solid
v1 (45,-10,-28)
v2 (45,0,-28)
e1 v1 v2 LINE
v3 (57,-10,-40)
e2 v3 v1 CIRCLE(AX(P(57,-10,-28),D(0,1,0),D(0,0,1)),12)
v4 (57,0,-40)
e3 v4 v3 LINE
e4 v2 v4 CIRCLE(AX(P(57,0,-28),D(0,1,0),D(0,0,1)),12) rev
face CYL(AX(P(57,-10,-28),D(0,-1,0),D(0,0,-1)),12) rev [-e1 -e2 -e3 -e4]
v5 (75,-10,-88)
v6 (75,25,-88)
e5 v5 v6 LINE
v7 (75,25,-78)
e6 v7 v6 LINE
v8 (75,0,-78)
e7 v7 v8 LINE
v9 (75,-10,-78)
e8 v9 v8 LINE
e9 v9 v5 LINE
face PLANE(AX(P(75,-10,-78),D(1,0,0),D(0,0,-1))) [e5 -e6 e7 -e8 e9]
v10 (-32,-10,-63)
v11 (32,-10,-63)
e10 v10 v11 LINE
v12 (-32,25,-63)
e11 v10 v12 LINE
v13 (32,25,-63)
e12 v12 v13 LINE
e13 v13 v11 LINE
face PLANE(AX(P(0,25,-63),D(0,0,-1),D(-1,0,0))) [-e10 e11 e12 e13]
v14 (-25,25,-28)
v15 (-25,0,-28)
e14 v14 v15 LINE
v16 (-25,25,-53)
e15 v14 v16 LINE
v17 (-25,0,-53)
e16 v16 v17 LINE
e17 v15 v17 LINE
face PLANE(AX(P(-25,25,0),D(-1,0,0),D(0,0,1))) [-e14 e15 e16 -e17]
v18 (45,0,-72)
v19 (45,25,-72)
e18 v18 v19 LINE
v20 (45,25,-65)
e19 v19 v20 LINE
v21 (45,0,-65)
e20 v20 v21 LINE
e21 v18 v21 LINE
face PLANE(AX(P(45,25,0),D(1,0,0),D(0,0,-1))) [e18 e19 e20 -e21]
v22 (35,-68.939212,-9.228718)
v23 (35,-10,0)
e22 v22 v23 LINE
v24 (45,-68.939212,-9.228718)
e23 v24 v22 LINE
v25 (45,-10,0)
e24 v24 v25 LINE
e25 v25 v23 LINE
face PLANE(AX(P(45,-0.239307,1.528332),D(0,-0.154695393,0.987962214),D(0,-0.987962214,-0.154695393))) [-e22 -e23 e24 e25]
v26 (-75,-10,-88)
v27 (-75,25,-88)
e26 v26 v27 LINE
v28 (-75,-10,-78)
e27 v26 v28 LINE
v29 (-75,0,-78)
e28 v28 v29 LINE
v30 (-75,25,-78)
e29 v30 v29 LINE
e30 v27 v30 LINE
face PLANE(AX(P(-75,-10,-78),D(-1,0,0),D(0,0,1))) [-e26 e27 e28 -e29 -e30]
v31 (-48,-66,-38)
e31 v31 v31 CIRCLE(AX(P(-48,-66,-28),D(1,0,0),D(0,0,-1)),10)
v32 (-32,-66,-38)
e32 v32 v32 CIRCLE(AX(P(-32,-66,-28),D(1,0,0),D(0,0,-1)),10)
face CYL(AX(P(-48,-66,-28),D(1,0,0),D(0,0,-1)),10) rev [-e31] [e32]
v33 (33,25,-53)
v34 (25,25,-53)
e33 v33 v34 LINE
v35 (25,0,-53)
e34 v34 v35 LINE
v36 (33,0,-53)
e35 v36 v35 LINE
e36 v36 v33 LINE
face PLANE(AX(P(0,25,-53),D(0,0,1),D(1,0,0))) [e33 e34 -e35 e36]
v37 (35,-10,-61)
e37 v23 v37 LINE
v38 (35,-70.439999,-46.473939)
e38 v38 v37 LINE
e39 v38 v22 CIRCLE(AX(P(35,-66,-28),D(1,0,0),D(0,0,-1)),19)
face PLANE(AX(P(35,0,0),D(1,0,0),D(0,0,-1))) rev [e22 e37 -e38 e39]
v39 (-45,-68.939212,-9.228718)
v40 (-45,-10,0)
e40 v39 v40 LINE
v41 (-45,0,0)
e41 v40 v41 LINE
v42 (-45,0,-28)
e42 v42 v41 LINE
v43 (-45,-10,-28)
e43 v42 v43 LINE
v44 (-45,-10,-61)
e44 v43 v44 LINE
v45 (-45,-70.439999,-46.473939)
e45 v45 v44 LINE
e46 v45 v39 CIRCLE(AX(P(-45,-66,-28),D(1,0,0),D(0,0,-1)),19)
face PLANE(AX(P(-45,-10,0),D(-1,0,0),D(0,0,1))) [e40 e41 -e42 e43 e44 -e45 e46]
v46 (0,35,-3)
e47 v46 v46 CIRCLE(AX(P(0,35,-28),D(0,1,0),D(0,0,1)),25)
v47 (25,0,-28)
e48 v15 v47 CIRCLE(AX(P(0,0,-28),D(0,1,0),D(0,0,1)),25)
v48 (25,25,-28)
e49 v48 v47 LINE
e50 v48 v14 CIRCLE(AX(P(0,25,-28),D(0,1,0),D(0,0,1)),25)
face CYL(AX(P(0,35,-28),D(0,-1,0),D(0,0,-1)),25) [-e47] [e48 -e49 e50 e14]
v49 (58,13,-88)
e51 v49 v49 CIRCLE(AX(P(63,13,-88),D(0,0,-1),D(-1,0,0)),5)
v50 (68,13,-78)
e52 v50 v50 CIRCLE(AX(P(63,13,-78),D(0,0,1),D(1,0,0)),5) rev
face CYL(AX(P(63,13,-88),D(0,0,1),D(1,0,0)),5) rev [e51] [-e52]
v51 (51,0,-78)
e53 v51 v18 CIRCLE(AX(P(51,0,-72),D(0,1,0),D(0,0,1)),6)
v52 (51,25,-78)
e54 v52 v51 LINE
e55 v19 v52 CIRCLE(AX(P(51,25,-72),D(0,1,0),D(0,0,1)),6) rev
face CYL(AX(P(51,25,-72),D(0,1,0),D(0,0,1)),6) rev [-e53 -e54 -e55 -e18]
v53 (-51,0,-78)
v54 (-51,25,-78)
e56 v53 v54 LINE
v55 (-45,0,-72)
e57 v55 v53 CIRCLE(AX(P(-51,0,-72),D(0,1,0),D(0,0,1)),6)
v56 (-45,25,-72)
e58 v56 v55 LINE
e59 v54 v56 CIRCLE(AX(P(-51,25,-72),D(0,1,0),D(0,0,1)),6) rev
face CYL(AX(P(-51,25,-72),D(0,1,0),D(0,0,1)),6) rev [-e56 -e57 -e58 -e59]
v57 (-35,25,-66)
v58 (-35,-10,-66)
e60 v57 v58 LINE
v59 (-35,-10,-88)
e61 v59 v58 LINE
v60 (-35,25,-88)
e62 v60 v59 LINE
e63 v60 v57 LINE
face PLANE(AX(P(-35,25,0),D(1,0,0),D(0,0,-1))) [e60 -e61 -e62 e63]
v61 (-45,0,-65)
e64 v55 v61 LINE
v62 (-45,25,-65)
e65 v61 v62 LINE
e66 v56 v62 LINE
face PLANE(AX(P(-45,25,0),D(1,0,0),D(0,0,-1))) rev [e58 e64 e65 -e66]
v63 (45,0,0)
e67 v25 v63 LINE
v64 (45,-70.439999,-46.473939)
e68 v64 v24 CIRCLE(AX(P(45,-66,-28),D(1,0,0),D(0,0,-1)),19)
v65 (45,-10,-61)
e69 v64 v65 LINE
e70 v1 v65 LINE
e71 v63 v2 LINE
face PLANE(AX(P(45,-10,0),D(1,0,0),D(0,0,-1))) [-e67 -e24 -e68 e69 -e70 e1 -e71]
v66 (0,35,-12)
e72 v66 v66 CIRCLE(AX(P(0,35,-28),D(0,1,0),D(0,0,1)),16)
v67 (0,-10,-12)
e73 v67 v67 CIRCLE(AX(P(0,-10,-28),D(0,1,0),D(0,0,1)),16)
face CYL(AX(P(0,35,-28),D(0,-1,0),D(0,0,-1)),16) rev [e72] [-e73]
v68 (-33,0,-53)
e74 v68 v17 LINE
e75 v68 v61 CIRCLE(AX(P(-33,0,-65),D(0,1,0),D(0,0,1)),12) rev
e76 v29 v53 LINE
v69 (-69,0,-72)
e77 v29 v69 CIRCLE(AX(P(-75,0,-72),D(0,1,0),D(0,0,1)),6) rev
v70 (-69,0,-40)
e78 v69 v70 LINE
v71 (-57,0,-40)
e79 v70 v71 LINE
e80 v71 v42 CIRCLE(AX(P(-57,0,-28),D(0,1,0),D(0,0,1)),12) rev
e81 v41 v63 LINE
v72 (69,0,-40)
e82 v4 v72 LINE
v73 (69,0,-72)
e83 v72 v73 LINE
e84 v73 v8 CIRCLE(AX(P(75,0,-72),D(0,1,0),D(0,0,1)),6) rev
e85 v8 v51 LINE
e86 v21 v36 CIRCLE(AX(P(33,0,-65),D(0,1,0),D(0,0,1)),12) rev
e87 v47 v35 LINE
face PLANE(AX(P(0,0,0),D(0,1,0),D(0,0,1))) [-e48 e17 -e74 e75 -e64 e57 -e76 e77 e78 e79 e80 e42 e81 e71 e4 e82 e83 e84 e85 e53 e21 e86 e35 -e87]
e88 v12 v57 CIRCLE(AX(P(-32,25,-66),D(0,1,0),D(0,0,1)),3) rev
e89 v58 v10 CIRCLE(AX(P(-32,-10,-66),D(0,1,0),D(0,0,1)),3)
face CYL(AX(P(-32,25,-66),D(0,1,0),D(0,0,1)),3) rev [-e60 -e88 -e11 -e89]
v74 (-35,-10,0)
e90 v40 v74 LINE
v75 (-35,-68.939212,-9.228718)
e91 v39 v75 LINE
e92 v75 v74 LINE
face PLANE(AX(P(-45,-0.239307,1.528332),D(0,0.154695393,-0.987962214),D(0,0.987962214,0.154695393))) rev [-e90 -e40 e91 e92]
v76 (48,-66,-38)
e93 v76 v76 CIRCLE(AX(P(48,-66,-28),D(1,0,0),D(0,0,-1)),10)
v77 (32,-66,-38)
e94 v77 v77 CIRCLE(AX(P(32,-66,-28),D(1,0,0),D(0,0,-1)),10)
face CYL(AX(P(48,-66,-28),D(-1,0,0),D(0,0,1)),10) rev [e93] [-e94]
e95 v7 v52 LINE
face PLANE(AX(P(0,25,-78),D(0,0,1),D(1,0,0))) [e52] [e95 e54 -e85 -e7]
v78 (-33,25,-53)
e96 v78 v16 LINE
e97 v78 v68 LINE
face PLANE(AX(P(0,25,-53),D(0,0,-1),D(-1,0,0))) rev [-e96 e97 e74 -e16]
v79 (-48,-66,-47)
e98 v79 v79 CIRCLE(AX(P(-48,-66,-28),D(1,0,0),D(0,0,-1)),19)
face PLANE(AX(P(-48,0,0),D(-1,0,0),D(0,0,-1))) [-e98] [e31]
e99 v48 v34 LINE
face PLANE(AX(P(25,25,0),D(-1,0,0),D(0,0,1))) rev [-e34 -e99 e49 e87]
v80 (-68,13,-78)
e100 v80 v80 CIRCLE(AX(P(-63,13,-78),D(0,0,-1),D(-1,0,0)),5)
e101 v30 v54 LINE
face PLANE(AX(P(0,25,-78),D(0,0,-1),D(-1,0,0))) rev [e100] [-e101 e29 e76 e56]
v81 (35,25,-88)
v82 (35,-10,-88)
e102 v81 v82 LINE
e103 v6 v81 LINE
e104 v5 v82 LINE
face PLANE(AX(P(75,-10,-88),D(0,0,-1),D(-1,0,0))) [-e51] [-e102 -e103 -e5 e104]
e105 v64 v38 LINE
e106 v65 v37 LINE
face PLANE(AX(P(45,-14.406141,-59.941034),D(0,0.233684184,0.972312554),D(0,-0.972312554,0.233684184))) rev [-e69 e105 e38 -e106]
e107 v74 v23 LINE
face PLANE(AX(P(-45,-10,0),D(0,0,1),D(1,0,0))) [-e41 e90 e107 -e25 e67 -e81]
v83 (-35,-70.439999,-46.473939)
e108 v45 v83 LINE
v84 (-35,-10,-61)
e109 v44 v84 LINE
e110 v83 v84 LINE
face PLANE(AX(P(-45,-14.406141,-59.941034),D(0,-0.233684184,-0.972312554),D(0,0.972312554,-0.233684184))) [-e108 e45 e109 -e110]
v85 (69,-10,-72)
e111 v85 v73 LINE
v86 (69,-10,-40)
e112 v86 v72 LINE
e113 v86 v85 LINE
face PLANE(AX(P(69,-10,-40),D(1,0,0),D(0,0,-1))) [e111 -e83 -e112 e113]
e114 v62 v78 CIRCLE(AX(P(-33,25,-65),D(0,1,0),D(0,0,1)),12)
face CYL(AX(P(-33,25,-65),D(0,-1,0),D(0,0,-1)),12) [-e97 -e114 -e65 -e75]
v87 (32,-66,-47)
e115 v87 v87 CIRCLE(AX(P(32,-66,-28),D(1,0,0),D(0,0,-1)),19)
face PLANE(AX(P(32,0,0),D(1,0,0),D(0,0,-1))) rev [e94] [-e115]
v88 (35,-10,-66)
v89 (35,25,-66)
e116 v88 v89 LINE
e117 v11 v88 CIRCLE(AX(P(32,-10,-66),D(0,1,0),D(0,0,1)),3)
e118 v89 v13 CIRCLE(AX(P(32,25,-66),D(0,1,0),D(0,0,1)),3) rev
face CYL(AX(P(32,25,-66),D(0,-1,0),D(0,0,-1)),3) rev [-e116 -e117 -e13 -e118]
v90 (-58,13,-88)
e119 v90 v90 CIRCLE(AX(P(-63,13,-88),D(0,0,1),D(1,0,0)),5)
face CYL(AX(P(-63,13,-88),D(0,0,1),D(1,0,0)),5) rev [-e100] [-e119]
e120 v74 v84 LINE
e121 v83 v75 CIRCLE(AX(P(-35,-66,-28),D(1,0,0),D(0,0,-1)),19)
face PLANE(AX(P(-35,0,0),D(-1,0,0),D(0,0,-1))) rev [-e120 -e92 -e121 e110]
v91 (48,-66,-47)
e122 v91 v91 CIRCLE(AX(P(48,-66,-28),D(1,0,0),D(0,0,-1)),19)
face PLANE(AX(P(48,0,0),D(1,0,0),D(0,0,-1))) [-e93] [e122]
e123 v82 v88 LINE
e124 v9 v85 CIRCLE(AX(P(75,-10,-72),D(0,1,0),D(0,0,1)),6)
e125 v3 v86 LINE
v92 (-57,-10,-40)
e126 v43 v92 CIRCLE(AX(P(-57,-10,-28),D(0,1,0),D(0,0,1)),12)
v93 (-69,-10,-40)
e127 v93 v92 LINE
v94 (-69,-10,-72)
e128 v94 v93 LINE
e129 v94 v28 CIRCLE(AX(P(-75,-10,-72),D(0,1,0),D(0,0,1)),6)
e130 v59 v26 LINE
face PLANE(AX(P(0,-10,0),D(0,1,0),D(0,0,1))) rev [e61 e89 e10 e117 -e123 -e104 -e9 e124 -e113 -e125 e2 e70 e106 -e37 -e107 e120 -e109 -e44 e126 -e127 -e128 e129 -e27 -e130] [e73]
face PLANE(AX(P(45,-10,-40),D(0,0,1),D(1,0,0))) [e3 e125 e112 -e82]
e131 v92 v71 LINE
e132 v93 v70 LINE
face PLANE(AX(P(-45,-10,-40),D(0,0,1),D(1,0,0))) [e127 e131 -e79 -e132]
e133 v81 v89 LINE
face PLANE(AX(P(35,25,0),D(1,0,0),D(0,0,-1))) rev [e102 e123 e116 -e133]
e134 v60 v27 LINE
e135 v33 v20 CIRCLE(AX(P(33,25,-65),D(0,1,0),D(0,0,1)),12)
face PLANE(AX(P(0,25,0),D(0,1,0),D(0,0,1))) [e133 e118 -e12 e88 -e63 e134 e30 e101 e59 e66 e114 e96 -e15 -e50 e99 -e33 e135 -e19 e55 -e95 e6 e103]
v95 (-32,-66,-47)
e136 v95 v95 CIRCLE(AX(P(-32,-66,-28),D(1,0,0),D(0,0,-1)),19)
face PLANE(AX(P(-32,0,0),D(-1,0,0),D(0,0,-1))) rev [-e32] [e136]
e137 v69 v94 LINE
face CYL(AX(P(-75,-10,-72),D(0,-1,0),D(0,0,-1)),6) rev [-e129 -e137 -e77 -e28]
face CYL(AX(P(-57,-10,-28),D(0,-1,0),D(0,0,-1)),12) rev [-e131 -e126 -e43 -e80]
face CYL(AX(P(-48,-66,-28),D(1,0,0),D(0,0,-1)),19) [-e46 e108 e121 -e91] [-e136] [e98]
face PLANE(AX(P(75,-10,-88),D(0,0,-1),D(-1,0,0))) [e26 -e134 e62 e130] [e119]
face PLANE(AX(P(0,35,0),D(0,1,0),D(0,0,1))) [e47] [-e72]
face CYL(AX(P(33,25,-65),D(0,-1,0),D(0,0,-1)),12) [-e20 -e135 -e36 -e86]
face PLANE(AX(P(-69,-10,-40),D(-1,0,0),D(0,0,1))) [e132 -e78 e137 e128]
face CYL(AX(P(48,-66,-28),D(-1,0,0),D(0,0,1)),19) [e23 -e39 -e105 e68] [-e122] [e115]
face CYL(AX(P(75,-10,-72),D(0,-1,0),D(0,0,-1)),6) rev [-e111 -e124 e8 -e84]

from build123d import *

# Parameters (mm, degrees)
EXTRUDE_1_DEPTH     = 10
FILLET_1_R          = 12
FILLET_2_R          = 6
EXTRUDE_2_DEPTH     = 25
EXTRUDE_3_DEPTH     = 35
SKETCH_2_4_W        = 70
SKETCH_2_4_H        = 25
CUT_EXTRUDE_1_DEPTH = 35
FILLET_3_R          = 6
FILLET_4_R          = 12
FILLET_5_R          = 3
CUT_EXTRUDE_START   = -35
CUT_EXTRUDE_2_DEPTH = 35
EXTRUDE_START       = 35
EXTRUDE_4_DEPTH     = 10
EXTRUDE_START_2     = 32
SKETCH_6_4_R        = 19
SKETCH_6_4_R_2      = 10
EXTRUDE_5_DEPTH     = 16
SKETCH_7_R          = 5
CUT_EXTRUDE_3_DEPTH = 144.506097431


with BuildPart() as part:
    # 草图1 → 凸台-拉伸1 (new body)
    with BuildSketch(Plane(origin=(0, 0, 0), x_dir=(1, 0, 0), z_dir=(0, 1, 0))):
        Polygon((45, 0), (45, 40), (69, 40), (69, 78), (75, 78), (75, 88), (-75, 88), (-75, 78), (-69, 78), (-69, 40), (-45, 40), (-45, 0), align=None)
    extrude(amount=-EXTRUDE_1_DEPTH)

    # 圆角1
    fillet_1_edges = [part.edges().sort_by_distance(p)[0] for p in [
        (-45, -5, -40),
        (45, -5, -40),
    ]]
    fillet(fillet_1_edges, radius=FILLET_1_R)

    # 圆角2
    fillet_2_edges = [part.edges().sort_by_distance(p)[0] for p in [
        (69, -5, -78),
        (-69, -5, -78),
    ]]
    fillet(fillet_2_edges, radius=FILLET_2_R - 0.0001)  # a hair under: the kernel refuses the full size

    # 草图2 → 凸台-拉伸2 (add)
    with BuildSketch(Plane(origin=(0, 0, 0), x_dir=(1, 0, 0), z_dir=(0, 1, 0))):
        with BuildLine():
            Line((-25, 53), (-25, 28))
            ThreePointArc((-25, 28), (-17.67766953, 45.67766953), (0, 53))
            Line((0, 53), (0, 63))
            Line((0, 63), (-35, 63))
            Line((-35, 63), (-35, 88))
            Line((-35, 88), (-75, 88))
            Line((-75, 88), (-75, 78))
            Line((-75, 78), (-45, 78))
            Line((-45, 78), (-45, 53))
            Line((-45, 53), (-25, 53))
        make_face()
        with BuildLine():
            ThreePointArc((0, 53), (17.67766953, 45.67766953), (25, 28))
            Line((25, 28), (25, 53))
            Line((25, 53), (45, 53))
            Line((45, 53), (45, 78))
            Line((45, 78), (75, 78))
            Line((75, 78), (75, 88))
            Line((75, 88), (35, 88))
            Line((35, 88), (35, 63))
            Line((35, 63), (0, 63))
            Line((0, 63), (0, 53))
        make_face()
    extrude(amount=EXTRUDE_2_DEPTH)

    # 草图2<3> → 凸台-拉伸3 (add)
    with BuildSketch(Plane(origin=(0, 0, 0), x_dir=(1, 0, 0), z_dir=(0, 1, 0))):
        with BuildLine():
            ThreePointArc((-25, 28), (-17.67766953, 10.32233047), (0, 3))
            Line((0, 3), (0, 12))
            ThreePointArc((0, 12), (-16, 28), (0, 44))
            Line((0, 44), (0, 53))
            ThreePointArc((0, 53), (-17.67766953, 45.67766953), (-25, 28))
        make_face()
        with BuildLine():
            Line((0, 12), (0, 3))
            ThreePointArc((0, 3), (17.67766953, 10.32233047), (25, 28))
            ThreePointArc((25, 28), (17.67766953, 45.67766953), (0, 53))
            Line((0, 53), (0, 44))
            ThreePointArc((0, 44), (11.313708499, 39.313708499), (16, 28))
            ThreePointArc((16, 28), (11.313708499, 16.686291501), (0, 12))
        make_face()
    extrude(amount=EXTRUDE_3_DEPTH)

    # 草图2<4> → 切除-拉伸1 (cut)
    with BuildSketch(Plane(origin=(0, 0, 0), x_dir=(1, 0, 0), z_dir=(0, 1, 0))):
        with Locations((0, 75.5)):
            Rectangle(SKETCH_2_4_W, SKETCH_2_4_H)
    extrude(amount=-CUT_EXTRUDE_1_DEPTH, mode=Mode.SUBTRACT)

    # 圆角3
    fillet_3_edges = [part.edges().sort_by_distance(p)[0] for p in [
        (45, 12.5, -78),
        (-45, 12.5, -78),
    ]]
    fillet(fillet_3_edges, radius=FILLET_3_R)

    # 圆角4
    fillet_4_edges = [part.edges().sort_by_distance(p)[0] for p in [
        (45, 12.5, -53),
        (-45, 12.5, -53),
    ]]
    fillet(fillet_4_edges, radius=FILLET_4_R)

    # 圆角5
    fillet_5_edges = [part.edges().sort_by_distance(p)[0] for p in [
        (35, 7.5, -63),
        (-35, 7.5, -63),
    ]]
    fillet(fillet_5_edges, radius=FILLET_5_R)

    # 草图2<5> → 切除-拉伸2 (cut)
    with BuildSketch(Plane(origin=(0, 0, 0), x_dir=(1, 0, 0), z_dir=(0, 1, 0)).offset(CUT_EXTRUDE_START)):
        with BuildLine():
            ThreePointArc((0, 44), (-16, 28), (0, 12))
            Line((0, 12), (0, 44))
        make_face()
        with BuildLine():
            Line((0, 44), (0, 12))
            ThreePointArc((0, 12), (11.313708499, 16.686291501), (16, 28))
            ThreePointArc((16, 28), (11.313708499, 39.313708499), (0, 44))
        make_face()
    extrude(amount=CUT_EXTRUDE_2_DEPTH, mode=Mode.SUBTRACT)

    # 草图6 → 凸台-拉伸4 (add)
    with BuildSketch(Plane(origin=(0, 0, 0), x_dir=(0, 0, -1), z_dir=(1, 0, 0)).offset(EXTRUDE_START)):
        with BuildLine():
            Line((0, -10), (9.228717941, -68.939212458))
            ThreePointArc((9.228717941, -68.939212458), (26.525951004, -47.057265785), (47, -66))
            ThreePointArc((47, -66), (46.868026287, -68.235527685), (46.473938523, -70.439999487))
            Line((46.473938523, -70.439999487), (56.431805566, -29.007331733))
            Line((56.431805566, -29.007331733), (61, -10))
            Line((61, -10), (0, -10))
        make_face()
    extrude_4 = extrude(amount=EXTRUDE_4_DEPTH)

    # 草图6<4> → 凸台-拉伸5 (add)
    with BuildSketch(Plane(origin=(0, 0, 0), x_dir=(0, 0, -1), z_dir=(1, 0, 0)).offset(EXTRUDE_START_2)):
        with Locations((28, -66)):
            Circle(SKETCH_6_4_R)
        with Locations((28, -66)):
            Circle(SKETCH_6_4_R_2, mode=Mode.SUBTRACT)
    extrude_5 = extrude(amount=EXTRUDE_5_DEPTH)

    # 镜向1: 凸台-拉伸4, 凸台-拉伸5 across plane
    add(extrude_4.mirror(Plane(origin=(0, 0, 0), x_dir=(0, 0, 1), z_dir=(1, 0, 0))))
    add(extrude_5.mirror(Plane(origin=(0, 0, 0), x_dir=(0, 0, 1), z_dir=(1, 0, 0))))

    # 草图7 → 切除-拉伸3 (cut, through all)
    with BuildSketch(Plane.XY):
        with Locations((-63, 13)):
            Circle(SKETCH_7_R)
    cut_extrude_3 = extrude(amount=-CUT_EXTRUDE_3_DEPTH, mode=Mode.SUBTRACT)

    # 镜向2: 切除-拉伸3 across plane
    add(cut_extrude_3.mirror(Plane(origin=(0, 0, 0), x_dir=(0, 0, 1), z_dir=(1, 0, 0))), mode=Mode.SUBTRACT)


solid = part.part
